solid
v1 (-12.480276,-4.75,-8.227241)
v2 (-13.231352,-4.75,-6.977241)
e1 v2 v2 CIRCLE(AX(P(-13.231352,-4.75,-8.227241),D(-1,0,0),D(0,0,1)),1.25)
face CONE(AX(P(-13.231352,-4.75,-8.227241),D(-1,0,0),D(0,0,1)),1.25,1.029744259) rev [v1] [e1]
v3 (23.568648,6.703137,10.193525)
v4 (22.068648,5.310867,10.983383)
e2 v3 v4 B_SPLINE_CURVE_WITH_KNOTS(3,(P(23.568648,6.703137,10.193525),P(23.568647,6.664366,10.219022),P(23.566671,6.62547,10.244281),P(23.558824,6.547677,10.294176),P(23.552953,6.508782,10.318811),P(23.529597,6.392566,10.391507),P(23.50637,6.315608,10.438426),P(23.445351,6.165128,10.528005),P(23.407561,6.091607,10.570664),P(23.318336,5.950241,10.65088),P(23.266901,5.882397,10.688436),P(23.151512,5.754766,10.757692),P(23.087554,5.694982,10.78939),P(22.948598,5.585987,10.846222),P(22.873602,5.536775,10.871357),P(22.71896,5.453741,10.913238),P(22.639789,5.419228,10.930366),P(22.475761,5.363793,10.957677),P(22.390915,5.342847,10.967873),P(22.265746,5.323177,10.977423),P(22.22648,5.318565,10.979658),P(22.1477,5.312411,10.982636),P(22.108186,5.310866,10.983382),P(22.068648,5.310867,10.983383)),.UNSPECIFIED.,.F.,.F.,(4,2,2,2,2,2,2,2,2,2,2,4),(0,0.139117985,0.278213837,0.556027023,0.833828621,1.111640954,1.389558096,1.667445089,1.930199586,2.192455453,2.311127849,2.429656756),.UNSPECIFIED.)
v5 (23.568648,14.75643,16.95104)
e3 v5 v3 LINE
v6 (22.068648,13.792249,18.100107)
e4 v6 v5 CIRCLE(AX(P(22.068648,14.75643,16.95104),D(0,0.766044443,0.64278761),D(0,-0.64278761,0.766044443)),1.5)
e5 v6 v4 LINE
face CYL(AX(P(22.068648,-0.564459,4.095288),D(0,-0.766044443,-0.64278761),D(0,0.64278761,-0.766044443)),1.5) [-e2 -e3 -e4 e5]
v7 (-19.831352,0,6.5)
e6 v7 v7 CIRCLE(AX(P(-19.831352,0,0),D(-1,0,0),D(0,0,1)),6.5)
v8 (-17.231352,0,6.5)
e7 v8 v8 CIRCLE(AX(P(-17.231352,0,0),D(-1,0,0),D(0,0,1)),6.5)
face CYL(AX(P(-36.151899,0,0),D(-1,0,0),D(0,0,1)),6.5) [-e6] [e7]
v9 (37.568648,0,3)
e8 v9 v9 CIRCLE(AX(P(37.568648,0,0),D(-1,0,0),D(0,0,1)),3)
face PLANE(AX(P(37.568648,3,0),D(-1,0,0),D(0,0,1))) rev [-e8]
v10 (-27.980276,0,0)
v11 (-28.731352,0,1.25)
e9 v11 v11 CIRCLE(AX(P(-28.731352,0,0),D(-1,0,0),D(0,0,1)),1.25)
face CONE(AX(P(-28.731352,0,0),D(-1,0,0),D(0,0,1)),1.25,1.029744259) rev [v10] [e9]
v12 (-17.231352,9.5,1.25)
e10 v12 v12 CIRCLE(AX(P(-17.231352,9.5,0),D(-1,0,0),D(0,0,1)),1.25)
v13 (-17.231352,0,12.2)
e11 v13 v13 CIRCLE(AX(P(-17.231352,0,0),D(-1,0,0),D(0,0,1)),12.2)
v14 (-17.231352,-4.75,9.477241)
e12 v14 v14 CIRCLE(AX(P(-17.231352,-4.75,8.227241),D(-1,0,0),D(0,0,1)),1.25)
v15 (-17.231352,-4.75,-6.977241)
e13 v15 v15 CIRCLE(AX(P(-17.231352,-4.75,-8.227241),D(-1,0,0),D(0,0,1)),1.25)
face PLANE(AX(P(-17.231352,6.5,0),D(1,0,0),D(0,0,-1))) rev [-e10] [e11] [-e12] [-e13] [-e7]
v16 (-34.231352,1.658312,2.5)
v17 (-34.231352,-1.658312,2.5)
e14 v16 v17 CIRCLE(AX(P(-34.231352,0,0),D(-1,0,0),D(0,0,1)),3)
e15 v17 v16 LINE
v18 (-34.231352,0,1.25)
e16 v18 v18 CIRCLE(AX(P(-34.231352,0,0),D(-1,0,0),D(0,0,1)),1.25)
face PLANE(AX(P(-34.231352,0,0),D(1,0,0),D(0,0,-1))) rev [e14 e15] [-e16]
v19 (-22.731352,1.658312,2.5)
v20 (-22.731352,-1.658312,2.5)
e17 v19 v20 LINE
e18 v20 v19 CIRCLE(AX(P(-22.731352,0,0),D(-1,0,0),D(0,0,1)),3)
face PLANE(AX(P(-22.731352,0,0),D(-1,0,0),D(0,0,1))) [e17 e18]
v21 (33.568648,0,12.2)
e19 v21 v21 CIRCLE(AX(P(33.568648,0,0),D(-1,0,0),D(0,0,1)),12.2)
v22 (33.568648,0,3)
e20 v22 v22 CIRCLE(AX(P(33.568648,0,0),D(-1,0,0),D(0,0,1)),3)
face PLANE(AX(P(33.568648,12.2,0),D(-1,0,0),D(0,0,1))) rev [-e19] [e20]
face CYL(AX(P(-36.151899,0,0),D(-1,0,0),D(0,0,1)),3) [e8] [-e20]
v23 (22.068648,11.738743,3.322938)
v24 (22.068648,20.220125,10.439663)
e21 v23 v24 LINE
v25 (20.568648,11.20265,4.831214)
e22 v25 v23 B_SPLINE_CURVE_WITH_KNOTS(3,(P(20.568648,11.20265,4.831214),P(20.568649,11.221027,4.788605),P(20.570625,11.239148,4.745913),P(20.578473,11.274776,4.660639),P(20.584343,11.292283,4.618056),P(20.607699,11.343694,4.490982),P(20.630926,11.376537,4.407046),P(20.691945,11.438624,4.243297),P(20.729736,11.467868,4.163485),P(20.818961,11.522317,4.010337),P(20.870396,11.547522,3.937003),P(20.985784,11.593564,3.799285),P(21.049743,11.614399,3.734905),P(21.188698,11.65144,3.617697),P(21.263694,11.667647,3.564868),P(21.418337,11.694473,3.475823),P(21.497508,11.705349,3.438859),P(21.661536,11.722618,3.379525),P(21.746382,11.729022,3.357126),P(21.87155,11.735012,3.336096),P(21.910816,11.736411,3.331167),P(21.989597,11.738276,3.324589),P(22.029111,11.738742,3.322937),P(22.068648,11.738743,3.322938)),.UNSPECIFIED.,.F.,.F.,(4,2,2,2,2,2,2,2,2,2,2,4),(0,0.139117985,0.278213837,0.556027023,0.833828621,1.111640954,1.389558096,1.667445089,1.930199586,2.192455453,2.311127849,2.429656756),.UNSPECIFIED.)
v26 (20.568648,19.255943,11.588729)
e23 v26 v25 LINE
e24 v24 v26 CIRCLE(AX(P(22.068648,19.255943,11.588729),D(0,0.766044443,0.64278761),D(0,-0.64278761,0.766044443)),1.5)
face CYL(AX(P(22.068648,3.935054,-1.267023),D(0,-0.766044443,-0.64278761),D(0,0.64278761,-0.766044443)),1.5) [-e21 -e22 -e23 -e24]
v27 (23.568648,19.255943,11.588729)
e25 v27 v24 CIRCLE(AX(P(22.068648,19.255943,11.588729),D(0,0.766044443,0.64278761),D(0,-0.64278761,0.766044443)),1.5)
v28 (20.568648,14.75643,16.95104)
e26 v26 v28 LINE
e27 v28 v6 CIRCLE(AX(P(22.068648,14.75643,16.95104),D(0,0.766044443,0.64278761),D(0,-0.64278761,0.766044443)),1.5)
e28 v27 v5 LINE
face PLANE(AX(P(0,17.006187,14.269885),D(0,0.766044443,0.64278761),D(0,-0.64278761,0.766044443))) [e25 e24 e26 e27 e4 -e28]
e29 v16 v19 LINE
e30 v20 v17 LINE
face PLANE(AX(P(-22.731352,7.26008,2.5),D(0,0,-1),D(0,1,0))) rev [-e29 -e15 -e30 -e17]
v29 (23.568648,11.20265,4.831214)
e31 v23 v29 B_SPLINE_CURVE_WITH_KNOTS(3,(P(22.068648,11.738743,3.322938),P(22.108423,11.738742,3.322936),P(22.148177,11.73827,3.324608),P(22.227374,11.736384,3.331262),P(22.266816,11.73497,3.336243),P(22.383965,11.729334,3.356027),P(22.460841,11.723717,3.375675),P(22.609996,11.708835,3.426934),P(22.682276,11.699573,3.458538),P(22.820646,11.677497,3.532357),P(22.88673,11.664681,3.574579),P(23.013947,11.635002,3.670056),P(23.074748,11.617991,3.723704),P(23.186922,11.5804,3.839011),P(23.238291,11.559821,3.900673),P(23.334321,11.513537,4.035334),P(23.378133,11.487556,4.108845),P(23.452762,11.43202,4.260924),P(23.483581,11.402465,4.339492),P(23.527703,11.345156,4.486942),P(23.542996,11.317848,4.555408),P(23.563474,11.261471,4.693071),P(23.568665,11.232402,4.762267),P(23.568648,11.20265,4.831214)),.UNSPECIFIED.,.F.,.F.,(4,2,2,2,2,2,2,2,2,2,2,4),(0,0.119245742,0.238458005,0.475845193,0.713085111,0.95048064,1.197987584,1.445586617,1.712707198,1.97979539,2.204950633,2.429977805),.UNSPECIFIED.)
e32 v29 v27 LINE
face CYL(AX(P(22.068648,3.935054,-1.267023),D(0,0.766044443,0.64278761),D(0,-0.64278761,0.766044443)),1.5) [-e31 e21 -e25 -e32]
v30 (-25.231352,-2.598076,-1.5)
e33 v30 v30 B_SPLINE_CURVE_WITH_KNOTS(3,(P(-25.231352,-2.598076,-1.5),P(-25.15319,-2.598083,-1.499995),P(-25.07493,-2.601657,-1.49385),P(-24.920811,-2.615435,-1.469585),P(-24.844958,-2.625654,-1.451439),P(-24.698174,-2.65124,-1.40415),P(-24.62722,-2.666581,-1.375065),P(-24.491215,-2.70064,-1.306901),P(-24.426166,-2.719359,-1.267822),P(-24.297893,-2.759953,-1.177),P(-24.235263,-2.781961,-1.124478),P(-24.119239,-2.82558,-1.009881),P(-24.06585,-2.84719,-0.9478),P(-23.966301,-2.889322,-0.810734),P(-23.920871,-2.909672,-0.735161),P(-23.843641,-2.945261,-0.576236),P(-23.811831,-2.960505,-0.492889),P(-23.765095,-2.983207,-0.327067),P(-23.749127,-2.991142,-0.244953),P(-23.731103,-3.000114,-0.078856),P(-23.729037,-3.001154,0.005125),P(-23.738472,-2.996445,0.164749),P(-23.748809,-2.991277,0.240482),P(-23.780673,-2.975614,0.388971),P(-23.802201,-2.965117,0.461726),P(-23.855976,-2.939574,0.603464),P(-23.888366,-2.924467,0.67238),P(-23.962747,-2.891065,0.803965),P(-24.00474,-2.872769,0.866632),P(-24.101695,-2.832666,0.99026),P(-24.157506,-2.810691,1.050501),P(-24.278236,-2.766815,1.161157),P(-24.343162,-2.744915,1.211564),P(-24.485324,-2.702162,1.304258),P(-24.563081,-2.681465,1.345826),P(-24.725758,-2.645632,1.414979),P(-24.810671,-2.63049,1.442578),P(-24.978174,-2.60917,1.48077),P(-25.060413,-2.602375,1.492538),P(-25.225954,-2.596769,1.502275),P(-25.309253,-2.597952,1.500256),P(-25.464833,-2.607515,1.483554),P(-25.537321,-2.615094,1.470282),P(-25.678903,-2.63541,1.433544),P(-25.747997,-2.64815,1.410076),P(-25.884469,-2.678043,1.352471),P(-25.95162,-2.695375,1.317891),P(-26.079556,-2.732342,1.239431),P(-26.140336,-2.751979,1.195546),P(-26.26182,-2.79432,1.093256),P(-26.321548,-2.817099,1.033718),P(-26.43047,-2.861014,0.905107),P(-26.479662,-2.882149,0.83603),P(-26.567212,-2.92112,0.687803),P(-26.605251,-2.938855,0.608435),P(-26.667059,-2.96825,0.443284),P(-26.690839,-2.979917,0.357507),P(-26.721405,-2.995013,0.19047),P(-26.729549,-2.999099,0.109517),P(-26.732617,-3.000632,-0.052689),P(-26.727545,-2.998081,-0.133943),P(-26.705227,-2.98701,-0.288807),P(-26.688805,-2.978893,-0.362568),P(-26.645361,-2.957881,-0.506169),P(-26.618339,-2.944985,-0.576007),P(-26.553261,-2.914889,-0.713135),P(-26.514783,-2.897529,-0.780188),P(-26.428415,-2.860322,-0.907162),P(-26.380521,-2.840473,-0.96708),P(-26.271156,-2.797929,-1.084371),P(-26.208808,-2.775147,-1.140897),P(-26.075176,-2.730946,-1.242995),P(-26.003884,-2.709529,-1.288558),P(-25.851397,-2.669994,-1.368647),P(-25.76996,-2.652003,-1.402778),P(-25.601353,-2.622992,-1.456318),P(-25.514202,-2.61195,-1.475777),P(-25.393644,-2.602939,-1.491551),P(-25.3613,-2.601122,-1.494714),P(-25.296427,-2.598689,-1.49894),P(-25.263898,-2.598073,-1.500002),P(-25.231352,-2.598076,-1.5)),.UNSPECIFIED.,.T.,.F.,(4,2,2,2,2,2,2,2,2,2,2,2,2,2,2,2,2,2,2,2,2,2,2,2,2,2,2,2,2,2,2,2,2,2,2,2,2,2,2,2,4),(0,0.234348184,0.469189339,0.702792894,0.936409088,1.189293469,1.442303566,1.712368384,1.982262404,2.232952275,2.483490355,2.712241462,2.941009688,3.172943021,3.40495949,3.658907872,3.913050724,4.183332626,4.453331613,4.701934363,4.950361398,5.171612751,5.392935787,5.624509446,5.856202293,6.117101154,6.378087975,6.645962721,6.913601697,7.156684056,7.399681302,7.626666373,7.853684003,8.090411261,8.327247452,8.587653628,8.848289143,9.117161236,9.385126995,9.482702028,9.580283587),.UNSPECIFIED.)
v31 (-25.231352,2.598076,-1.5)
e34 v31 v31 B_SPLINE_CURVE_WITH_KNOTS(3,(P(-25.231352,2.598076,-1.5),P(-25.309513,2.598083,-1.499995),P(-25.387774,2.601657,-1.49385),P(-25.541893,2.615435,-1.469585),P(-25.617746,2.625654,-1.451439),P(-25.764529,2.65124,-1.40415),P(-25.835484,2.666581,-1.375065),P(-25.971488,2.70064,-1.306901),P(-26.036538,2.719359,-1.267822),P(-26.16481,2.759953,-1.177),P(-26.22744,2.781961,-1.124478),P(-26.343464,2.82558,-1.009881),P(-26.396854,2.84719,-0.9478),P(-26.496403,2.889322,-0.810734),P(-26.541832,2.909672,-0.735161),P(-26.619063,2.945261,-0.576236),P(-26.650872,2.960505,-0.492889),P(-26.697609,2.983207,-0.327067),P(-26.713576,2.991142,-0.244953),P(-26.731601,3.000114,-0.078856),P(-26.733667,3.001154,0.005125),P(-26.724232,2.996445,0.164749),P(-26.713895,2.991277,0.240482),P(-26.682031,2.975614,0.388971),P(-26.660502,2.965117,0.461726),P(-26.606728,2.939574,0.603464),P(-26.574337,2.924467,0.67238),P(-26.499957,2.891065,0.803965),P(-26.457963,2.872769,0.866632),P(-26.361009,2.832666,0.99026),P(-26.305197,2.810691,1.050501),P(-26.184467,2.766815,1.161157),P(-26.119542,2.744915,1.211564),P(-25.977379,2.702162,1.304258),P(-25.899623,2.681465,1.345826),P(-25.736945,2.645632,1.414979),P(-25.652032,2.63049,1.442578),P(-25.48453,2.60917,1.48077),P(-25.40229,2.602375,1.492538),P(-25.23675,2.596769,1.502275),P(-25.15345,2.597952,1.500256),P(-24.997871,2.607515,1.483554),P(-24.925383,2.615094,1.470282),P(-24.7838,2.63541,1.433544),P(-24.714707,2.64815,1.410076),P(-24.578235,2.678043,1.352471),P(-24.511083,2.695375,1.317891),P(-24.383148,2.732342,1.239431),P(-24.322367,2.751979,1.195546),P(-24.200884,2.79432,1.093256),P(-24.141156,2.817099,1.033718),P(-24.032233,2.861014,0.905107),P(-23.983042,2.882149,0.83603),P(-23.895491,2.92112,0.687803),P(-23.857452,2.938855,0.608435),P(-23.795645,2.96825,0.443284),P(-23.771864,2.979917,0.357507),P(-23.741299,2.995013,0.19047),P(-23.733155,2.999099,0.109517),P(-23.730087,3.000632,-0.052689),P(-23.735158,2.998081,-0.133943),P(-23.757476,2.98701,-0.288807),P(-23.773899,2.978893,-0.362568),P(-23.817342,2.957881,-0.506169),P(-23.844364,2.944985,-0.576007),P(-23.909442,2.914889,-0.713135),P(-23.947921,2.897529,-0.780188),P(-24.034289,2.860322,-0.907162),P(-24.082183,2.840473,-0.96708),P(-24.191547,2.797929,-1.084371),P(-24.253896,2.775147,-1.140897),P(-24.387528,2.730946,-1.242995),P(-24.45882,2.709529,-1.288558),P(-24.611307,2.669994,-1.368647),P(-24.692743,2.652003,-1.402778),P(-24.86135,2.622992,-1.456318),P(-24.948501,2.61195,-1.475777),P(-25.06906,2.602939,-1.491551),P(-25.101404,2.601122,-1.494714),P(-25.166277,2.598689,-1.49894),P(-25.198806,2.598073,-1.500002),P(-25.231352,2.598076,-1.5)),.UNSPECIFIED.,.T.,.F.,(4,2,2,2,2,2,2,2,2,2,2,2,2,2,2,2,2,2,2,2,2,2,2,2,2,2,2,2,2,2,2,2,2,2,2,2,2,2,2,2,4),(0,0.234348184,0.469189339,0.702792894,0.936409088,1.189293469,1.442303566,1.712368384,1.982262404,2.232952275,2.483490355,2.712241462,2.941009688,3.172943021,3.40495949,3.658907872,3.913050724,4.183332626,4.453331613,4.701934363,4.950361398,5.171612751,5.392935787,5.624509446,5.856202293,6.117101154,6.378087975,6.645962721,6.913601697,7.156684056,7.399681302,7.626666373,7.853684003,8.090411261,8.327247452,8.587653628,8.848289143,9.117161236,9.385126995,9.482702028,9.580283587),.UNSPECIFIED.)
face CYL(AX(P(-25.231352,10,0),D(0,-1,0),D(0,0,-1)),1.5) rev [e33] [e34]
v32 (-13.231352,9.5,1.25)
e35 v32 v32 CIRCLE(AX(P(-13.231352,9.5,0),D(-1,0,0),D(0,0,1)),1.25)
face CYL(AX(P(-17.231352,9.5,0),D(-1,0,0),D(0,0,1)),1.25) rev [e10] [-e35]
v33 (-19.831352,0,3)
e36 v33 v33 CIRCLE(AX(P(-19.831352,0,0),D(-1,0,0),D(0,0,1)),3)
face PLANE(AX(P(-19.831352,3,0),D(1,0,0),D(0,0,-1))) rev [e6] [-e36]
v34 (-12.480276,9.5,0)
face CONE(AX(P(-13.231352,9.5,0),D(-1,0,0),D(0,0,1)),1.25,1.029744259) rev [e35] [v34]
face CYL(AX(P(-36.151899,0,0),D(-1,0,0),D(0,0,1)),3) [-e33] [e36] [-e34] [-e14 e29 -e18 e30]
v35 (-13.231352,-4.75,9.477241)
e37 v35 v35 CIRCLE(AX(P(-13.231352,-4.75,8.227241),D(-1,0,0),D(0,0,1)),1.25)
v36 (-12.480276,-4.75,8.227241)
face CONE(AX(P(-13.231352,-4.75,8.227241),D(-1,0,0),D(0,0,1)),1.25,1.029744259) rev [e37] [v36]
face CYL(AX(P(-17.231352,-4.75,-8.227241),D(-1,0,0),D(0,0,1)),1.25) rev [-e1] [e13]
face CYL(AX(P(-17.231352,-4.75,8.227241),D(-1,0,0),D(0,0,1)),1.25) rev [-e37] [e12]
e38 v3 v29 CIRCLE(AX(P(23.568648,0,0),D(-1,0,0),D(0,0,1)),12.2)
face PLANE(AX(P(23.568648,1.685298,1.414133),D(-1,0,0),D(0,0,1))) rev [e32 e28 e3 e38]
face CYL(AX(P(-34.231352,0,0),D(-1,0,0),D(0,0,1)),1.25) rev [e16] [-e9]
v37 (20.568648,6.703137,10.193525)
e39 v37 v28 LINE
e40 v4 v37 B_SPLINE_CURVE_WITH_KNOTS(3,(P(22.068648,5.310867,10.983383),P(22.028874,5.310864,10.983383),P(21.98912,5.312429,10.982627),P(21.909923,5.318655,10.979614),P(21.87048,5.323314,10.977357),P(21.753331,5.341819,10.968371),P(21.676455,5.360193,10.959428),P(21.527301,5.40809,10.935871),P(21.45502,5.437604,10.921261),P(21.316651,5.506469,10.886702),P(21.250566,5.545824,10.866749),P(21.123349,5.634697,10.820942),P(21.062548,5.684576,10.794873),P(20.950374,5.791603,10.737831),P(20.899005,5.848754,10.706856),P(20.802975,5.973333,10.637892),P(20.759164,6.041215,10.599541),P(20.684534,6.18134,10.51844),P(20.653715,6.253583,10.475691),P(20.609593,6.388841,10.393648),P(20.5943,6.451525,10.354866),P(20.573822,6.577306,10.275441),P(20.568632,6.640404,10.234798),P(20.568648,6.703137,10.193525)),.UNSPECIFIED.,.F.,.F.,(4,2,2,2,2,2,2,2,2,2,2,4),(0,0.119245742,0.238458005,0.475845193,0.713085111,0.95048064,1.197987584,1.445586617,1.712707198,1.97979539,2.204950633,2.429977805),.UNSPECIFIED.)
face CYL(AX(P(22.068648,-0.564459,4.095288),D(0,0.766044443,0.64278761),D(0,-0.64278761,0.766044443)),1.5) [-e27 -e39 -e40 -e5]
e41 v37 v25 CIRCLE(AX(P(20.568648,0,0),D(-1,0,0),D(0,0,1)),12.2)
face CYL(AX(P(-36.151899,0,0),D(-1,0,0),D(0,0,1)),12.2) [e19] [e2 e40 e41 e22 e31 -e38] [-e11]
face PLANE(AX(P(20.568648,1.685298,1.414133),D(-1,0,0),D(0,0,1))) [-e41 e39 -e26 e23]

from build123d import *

# Parameters (mm, degrees)
HOLE_WIZARD_M3_1_D       = 2.5
HOLE_WIZARD_M3_1_DEPTH   = 4
HOLE_WIZARD_M3_1_TIP     = 0.751075774
CUT_EXTRUDE_1_DEPTH      = 10
CUT_EXTRUDE_1_DEPTH_BACK = 10
SKETCH_4_R               = 1.5
SKETCH_5_W               = 6.291710533
SKETCH_5_H               = 14.520159288
CUT_EXTRUDE_2_DEPTH      = 11.5
HOLE_WIZARD_M3_2_D       = 2.5
HOLE_WIZARD_M3_2_DEPTH   = 5.5
HOLE_WIZARD_M3_2_TIP     = 0.751075774
EXTRUDE_2_DEPTH          = 10
EXTRUDE_2_DEPTH_BACK     = 10
SKETCH_9_W               = 3
SKETCH_9_H               = 10
FILLET_2_R               = 1.5


with BuildPart() as part:
    # 草图1 → 旋转1 (revolve)
    with BuildSketch(Plane.XY, mode=Mode.PRIVATE) as revolve_1_sk:
        Polygon((-34.231351781, 0), (-34.231351781, 3), (-19.831351781, 3), (-19.831351781, 6.5), (-17.231351781, 6.5), (-17.231351781, 12.2), (33.568648219, 12.2), (33.568648219, 3), (37.568648219, 3), (37.568648219, 0), align=None)
    revolve(revolve_1_sk.sketch.rotate(Axis((-36.151898734, 0, 0), (1, 0, 0)), 90), axis=Axis((-36.151898734, 0, 0), (1, 0, 0)))

    # M3 螺纹孔1
    with Locations(Plane(origin=(-17.231351781, 9.5, 0), x_dir=(0, 0, -1), z_dir=(-1, 0, 0))):
        with Locations((0, 0), (8.227241336, 14.25), (-8.227241336, 14.25)):
            Hole(HOLE_WIZARD_M3_1_D / 2, depth=HOLE_WIZARD_M3_1_DEPTH)
            with Locations((0, 0, -(HOLE_WIZARD_M3_1_DEPTH + HOLE_WIZARD_M3_1_TIP / 2))):  # 118° drill point
                Cone(0, HOLE_WIZARD_M3_1_D / 2, HOLE_WIZARD_M3_1_TIP, mode=Mode.SUBTRACT)

    # 草图4 → 切除-拉伸1 (cut, two sides: drawn at the far end of the back side and taken through both)
    with BuildSketch(Plane(origin=(0, 0, 0), x_dir=(1, 0, 0), z_dir=(0, 1, 0)).offset(-CUT_EXTRUDE_1_DEPTH_BACK)):
        with Locations(Location((-25.231351781, 0, 0), (0, 0, 90))):
            Circle(SKETCH_4_R)
    extrude(amount=CUT_EXTRUDE_1_DEPTH + CUT_EXTRUDE_1_DEPTH_BACK, mode=Mode.SUBTRACT)

    # 草图5 → 切除-拉伸2 (cut)
    with BuildSketch(Plane.ZY.offset(34.231351781)):
        with Locations((5.645855266, 0)):
            Rectangle(SKETCH_5_W, SKETCH_5_H)
    extrude(amount=-CUT_EXTRUDE_2_DEPTH, mode=Mode.SUBTRACT)

    # M3 螺纹孔2
    with Locations(Plane.ZY.offset(34.231351781)):
        with Locations((0, 0)):
            Hole(HOLE_WIZARD_M3_2_D / 2, depth=HOLE_WIZARD_M3_2_DEPTH)
            with Locations((0, 0, -(HOLE_WIZARD_M3_2_DEPTH + HOLE_WIZARD_M3_2_TIP / 2))):  # 118° drill point
                Cone(0, HOLE_WIZARD_M3_2_D / 2, HOLE_WIZARD_M3_2_TIP, mode=Mode.SUBTRACT)

    # 草图9 → 凸台-拉伸2 (add, two sides: drawn at the far end of the back side and taken through both)
    with BuildSketch(Plane(origin=(0, 9.345742206, 7.842008838), x_dir=(1, 0, 0), z_dir=(0, 0.7660444431189817, 0.642787609686535)).offset(-EXTRUDE_2_DEPTH_BACK)):
        with Locations((22.068648219, 0)):
            Rectangle(SKETCH_9_W, SKETCH_9_H)
    extrude(amount=EXTRUDE_2_DEPTH + EXTRUDE_2_DEPTH_BACK)

    # 圆角2
    fillet_2_edges = [part.edges().sort_by_distance(p)[0] for p in [
        (23.568648219, 9.55155762, 14.541744923),
        (20.568648219, 9.55155762, 14.541744923),
        (23.568648219, 15.979433717, 6.881300491),
        (20.568648219, 15.979433717, 6.881300491),
    ]]
    fillet(fillet_2_edges, radius=FILLET_2_R - 0.0001)  # a hair under: the kernel refuses the full size


solid = part.part
